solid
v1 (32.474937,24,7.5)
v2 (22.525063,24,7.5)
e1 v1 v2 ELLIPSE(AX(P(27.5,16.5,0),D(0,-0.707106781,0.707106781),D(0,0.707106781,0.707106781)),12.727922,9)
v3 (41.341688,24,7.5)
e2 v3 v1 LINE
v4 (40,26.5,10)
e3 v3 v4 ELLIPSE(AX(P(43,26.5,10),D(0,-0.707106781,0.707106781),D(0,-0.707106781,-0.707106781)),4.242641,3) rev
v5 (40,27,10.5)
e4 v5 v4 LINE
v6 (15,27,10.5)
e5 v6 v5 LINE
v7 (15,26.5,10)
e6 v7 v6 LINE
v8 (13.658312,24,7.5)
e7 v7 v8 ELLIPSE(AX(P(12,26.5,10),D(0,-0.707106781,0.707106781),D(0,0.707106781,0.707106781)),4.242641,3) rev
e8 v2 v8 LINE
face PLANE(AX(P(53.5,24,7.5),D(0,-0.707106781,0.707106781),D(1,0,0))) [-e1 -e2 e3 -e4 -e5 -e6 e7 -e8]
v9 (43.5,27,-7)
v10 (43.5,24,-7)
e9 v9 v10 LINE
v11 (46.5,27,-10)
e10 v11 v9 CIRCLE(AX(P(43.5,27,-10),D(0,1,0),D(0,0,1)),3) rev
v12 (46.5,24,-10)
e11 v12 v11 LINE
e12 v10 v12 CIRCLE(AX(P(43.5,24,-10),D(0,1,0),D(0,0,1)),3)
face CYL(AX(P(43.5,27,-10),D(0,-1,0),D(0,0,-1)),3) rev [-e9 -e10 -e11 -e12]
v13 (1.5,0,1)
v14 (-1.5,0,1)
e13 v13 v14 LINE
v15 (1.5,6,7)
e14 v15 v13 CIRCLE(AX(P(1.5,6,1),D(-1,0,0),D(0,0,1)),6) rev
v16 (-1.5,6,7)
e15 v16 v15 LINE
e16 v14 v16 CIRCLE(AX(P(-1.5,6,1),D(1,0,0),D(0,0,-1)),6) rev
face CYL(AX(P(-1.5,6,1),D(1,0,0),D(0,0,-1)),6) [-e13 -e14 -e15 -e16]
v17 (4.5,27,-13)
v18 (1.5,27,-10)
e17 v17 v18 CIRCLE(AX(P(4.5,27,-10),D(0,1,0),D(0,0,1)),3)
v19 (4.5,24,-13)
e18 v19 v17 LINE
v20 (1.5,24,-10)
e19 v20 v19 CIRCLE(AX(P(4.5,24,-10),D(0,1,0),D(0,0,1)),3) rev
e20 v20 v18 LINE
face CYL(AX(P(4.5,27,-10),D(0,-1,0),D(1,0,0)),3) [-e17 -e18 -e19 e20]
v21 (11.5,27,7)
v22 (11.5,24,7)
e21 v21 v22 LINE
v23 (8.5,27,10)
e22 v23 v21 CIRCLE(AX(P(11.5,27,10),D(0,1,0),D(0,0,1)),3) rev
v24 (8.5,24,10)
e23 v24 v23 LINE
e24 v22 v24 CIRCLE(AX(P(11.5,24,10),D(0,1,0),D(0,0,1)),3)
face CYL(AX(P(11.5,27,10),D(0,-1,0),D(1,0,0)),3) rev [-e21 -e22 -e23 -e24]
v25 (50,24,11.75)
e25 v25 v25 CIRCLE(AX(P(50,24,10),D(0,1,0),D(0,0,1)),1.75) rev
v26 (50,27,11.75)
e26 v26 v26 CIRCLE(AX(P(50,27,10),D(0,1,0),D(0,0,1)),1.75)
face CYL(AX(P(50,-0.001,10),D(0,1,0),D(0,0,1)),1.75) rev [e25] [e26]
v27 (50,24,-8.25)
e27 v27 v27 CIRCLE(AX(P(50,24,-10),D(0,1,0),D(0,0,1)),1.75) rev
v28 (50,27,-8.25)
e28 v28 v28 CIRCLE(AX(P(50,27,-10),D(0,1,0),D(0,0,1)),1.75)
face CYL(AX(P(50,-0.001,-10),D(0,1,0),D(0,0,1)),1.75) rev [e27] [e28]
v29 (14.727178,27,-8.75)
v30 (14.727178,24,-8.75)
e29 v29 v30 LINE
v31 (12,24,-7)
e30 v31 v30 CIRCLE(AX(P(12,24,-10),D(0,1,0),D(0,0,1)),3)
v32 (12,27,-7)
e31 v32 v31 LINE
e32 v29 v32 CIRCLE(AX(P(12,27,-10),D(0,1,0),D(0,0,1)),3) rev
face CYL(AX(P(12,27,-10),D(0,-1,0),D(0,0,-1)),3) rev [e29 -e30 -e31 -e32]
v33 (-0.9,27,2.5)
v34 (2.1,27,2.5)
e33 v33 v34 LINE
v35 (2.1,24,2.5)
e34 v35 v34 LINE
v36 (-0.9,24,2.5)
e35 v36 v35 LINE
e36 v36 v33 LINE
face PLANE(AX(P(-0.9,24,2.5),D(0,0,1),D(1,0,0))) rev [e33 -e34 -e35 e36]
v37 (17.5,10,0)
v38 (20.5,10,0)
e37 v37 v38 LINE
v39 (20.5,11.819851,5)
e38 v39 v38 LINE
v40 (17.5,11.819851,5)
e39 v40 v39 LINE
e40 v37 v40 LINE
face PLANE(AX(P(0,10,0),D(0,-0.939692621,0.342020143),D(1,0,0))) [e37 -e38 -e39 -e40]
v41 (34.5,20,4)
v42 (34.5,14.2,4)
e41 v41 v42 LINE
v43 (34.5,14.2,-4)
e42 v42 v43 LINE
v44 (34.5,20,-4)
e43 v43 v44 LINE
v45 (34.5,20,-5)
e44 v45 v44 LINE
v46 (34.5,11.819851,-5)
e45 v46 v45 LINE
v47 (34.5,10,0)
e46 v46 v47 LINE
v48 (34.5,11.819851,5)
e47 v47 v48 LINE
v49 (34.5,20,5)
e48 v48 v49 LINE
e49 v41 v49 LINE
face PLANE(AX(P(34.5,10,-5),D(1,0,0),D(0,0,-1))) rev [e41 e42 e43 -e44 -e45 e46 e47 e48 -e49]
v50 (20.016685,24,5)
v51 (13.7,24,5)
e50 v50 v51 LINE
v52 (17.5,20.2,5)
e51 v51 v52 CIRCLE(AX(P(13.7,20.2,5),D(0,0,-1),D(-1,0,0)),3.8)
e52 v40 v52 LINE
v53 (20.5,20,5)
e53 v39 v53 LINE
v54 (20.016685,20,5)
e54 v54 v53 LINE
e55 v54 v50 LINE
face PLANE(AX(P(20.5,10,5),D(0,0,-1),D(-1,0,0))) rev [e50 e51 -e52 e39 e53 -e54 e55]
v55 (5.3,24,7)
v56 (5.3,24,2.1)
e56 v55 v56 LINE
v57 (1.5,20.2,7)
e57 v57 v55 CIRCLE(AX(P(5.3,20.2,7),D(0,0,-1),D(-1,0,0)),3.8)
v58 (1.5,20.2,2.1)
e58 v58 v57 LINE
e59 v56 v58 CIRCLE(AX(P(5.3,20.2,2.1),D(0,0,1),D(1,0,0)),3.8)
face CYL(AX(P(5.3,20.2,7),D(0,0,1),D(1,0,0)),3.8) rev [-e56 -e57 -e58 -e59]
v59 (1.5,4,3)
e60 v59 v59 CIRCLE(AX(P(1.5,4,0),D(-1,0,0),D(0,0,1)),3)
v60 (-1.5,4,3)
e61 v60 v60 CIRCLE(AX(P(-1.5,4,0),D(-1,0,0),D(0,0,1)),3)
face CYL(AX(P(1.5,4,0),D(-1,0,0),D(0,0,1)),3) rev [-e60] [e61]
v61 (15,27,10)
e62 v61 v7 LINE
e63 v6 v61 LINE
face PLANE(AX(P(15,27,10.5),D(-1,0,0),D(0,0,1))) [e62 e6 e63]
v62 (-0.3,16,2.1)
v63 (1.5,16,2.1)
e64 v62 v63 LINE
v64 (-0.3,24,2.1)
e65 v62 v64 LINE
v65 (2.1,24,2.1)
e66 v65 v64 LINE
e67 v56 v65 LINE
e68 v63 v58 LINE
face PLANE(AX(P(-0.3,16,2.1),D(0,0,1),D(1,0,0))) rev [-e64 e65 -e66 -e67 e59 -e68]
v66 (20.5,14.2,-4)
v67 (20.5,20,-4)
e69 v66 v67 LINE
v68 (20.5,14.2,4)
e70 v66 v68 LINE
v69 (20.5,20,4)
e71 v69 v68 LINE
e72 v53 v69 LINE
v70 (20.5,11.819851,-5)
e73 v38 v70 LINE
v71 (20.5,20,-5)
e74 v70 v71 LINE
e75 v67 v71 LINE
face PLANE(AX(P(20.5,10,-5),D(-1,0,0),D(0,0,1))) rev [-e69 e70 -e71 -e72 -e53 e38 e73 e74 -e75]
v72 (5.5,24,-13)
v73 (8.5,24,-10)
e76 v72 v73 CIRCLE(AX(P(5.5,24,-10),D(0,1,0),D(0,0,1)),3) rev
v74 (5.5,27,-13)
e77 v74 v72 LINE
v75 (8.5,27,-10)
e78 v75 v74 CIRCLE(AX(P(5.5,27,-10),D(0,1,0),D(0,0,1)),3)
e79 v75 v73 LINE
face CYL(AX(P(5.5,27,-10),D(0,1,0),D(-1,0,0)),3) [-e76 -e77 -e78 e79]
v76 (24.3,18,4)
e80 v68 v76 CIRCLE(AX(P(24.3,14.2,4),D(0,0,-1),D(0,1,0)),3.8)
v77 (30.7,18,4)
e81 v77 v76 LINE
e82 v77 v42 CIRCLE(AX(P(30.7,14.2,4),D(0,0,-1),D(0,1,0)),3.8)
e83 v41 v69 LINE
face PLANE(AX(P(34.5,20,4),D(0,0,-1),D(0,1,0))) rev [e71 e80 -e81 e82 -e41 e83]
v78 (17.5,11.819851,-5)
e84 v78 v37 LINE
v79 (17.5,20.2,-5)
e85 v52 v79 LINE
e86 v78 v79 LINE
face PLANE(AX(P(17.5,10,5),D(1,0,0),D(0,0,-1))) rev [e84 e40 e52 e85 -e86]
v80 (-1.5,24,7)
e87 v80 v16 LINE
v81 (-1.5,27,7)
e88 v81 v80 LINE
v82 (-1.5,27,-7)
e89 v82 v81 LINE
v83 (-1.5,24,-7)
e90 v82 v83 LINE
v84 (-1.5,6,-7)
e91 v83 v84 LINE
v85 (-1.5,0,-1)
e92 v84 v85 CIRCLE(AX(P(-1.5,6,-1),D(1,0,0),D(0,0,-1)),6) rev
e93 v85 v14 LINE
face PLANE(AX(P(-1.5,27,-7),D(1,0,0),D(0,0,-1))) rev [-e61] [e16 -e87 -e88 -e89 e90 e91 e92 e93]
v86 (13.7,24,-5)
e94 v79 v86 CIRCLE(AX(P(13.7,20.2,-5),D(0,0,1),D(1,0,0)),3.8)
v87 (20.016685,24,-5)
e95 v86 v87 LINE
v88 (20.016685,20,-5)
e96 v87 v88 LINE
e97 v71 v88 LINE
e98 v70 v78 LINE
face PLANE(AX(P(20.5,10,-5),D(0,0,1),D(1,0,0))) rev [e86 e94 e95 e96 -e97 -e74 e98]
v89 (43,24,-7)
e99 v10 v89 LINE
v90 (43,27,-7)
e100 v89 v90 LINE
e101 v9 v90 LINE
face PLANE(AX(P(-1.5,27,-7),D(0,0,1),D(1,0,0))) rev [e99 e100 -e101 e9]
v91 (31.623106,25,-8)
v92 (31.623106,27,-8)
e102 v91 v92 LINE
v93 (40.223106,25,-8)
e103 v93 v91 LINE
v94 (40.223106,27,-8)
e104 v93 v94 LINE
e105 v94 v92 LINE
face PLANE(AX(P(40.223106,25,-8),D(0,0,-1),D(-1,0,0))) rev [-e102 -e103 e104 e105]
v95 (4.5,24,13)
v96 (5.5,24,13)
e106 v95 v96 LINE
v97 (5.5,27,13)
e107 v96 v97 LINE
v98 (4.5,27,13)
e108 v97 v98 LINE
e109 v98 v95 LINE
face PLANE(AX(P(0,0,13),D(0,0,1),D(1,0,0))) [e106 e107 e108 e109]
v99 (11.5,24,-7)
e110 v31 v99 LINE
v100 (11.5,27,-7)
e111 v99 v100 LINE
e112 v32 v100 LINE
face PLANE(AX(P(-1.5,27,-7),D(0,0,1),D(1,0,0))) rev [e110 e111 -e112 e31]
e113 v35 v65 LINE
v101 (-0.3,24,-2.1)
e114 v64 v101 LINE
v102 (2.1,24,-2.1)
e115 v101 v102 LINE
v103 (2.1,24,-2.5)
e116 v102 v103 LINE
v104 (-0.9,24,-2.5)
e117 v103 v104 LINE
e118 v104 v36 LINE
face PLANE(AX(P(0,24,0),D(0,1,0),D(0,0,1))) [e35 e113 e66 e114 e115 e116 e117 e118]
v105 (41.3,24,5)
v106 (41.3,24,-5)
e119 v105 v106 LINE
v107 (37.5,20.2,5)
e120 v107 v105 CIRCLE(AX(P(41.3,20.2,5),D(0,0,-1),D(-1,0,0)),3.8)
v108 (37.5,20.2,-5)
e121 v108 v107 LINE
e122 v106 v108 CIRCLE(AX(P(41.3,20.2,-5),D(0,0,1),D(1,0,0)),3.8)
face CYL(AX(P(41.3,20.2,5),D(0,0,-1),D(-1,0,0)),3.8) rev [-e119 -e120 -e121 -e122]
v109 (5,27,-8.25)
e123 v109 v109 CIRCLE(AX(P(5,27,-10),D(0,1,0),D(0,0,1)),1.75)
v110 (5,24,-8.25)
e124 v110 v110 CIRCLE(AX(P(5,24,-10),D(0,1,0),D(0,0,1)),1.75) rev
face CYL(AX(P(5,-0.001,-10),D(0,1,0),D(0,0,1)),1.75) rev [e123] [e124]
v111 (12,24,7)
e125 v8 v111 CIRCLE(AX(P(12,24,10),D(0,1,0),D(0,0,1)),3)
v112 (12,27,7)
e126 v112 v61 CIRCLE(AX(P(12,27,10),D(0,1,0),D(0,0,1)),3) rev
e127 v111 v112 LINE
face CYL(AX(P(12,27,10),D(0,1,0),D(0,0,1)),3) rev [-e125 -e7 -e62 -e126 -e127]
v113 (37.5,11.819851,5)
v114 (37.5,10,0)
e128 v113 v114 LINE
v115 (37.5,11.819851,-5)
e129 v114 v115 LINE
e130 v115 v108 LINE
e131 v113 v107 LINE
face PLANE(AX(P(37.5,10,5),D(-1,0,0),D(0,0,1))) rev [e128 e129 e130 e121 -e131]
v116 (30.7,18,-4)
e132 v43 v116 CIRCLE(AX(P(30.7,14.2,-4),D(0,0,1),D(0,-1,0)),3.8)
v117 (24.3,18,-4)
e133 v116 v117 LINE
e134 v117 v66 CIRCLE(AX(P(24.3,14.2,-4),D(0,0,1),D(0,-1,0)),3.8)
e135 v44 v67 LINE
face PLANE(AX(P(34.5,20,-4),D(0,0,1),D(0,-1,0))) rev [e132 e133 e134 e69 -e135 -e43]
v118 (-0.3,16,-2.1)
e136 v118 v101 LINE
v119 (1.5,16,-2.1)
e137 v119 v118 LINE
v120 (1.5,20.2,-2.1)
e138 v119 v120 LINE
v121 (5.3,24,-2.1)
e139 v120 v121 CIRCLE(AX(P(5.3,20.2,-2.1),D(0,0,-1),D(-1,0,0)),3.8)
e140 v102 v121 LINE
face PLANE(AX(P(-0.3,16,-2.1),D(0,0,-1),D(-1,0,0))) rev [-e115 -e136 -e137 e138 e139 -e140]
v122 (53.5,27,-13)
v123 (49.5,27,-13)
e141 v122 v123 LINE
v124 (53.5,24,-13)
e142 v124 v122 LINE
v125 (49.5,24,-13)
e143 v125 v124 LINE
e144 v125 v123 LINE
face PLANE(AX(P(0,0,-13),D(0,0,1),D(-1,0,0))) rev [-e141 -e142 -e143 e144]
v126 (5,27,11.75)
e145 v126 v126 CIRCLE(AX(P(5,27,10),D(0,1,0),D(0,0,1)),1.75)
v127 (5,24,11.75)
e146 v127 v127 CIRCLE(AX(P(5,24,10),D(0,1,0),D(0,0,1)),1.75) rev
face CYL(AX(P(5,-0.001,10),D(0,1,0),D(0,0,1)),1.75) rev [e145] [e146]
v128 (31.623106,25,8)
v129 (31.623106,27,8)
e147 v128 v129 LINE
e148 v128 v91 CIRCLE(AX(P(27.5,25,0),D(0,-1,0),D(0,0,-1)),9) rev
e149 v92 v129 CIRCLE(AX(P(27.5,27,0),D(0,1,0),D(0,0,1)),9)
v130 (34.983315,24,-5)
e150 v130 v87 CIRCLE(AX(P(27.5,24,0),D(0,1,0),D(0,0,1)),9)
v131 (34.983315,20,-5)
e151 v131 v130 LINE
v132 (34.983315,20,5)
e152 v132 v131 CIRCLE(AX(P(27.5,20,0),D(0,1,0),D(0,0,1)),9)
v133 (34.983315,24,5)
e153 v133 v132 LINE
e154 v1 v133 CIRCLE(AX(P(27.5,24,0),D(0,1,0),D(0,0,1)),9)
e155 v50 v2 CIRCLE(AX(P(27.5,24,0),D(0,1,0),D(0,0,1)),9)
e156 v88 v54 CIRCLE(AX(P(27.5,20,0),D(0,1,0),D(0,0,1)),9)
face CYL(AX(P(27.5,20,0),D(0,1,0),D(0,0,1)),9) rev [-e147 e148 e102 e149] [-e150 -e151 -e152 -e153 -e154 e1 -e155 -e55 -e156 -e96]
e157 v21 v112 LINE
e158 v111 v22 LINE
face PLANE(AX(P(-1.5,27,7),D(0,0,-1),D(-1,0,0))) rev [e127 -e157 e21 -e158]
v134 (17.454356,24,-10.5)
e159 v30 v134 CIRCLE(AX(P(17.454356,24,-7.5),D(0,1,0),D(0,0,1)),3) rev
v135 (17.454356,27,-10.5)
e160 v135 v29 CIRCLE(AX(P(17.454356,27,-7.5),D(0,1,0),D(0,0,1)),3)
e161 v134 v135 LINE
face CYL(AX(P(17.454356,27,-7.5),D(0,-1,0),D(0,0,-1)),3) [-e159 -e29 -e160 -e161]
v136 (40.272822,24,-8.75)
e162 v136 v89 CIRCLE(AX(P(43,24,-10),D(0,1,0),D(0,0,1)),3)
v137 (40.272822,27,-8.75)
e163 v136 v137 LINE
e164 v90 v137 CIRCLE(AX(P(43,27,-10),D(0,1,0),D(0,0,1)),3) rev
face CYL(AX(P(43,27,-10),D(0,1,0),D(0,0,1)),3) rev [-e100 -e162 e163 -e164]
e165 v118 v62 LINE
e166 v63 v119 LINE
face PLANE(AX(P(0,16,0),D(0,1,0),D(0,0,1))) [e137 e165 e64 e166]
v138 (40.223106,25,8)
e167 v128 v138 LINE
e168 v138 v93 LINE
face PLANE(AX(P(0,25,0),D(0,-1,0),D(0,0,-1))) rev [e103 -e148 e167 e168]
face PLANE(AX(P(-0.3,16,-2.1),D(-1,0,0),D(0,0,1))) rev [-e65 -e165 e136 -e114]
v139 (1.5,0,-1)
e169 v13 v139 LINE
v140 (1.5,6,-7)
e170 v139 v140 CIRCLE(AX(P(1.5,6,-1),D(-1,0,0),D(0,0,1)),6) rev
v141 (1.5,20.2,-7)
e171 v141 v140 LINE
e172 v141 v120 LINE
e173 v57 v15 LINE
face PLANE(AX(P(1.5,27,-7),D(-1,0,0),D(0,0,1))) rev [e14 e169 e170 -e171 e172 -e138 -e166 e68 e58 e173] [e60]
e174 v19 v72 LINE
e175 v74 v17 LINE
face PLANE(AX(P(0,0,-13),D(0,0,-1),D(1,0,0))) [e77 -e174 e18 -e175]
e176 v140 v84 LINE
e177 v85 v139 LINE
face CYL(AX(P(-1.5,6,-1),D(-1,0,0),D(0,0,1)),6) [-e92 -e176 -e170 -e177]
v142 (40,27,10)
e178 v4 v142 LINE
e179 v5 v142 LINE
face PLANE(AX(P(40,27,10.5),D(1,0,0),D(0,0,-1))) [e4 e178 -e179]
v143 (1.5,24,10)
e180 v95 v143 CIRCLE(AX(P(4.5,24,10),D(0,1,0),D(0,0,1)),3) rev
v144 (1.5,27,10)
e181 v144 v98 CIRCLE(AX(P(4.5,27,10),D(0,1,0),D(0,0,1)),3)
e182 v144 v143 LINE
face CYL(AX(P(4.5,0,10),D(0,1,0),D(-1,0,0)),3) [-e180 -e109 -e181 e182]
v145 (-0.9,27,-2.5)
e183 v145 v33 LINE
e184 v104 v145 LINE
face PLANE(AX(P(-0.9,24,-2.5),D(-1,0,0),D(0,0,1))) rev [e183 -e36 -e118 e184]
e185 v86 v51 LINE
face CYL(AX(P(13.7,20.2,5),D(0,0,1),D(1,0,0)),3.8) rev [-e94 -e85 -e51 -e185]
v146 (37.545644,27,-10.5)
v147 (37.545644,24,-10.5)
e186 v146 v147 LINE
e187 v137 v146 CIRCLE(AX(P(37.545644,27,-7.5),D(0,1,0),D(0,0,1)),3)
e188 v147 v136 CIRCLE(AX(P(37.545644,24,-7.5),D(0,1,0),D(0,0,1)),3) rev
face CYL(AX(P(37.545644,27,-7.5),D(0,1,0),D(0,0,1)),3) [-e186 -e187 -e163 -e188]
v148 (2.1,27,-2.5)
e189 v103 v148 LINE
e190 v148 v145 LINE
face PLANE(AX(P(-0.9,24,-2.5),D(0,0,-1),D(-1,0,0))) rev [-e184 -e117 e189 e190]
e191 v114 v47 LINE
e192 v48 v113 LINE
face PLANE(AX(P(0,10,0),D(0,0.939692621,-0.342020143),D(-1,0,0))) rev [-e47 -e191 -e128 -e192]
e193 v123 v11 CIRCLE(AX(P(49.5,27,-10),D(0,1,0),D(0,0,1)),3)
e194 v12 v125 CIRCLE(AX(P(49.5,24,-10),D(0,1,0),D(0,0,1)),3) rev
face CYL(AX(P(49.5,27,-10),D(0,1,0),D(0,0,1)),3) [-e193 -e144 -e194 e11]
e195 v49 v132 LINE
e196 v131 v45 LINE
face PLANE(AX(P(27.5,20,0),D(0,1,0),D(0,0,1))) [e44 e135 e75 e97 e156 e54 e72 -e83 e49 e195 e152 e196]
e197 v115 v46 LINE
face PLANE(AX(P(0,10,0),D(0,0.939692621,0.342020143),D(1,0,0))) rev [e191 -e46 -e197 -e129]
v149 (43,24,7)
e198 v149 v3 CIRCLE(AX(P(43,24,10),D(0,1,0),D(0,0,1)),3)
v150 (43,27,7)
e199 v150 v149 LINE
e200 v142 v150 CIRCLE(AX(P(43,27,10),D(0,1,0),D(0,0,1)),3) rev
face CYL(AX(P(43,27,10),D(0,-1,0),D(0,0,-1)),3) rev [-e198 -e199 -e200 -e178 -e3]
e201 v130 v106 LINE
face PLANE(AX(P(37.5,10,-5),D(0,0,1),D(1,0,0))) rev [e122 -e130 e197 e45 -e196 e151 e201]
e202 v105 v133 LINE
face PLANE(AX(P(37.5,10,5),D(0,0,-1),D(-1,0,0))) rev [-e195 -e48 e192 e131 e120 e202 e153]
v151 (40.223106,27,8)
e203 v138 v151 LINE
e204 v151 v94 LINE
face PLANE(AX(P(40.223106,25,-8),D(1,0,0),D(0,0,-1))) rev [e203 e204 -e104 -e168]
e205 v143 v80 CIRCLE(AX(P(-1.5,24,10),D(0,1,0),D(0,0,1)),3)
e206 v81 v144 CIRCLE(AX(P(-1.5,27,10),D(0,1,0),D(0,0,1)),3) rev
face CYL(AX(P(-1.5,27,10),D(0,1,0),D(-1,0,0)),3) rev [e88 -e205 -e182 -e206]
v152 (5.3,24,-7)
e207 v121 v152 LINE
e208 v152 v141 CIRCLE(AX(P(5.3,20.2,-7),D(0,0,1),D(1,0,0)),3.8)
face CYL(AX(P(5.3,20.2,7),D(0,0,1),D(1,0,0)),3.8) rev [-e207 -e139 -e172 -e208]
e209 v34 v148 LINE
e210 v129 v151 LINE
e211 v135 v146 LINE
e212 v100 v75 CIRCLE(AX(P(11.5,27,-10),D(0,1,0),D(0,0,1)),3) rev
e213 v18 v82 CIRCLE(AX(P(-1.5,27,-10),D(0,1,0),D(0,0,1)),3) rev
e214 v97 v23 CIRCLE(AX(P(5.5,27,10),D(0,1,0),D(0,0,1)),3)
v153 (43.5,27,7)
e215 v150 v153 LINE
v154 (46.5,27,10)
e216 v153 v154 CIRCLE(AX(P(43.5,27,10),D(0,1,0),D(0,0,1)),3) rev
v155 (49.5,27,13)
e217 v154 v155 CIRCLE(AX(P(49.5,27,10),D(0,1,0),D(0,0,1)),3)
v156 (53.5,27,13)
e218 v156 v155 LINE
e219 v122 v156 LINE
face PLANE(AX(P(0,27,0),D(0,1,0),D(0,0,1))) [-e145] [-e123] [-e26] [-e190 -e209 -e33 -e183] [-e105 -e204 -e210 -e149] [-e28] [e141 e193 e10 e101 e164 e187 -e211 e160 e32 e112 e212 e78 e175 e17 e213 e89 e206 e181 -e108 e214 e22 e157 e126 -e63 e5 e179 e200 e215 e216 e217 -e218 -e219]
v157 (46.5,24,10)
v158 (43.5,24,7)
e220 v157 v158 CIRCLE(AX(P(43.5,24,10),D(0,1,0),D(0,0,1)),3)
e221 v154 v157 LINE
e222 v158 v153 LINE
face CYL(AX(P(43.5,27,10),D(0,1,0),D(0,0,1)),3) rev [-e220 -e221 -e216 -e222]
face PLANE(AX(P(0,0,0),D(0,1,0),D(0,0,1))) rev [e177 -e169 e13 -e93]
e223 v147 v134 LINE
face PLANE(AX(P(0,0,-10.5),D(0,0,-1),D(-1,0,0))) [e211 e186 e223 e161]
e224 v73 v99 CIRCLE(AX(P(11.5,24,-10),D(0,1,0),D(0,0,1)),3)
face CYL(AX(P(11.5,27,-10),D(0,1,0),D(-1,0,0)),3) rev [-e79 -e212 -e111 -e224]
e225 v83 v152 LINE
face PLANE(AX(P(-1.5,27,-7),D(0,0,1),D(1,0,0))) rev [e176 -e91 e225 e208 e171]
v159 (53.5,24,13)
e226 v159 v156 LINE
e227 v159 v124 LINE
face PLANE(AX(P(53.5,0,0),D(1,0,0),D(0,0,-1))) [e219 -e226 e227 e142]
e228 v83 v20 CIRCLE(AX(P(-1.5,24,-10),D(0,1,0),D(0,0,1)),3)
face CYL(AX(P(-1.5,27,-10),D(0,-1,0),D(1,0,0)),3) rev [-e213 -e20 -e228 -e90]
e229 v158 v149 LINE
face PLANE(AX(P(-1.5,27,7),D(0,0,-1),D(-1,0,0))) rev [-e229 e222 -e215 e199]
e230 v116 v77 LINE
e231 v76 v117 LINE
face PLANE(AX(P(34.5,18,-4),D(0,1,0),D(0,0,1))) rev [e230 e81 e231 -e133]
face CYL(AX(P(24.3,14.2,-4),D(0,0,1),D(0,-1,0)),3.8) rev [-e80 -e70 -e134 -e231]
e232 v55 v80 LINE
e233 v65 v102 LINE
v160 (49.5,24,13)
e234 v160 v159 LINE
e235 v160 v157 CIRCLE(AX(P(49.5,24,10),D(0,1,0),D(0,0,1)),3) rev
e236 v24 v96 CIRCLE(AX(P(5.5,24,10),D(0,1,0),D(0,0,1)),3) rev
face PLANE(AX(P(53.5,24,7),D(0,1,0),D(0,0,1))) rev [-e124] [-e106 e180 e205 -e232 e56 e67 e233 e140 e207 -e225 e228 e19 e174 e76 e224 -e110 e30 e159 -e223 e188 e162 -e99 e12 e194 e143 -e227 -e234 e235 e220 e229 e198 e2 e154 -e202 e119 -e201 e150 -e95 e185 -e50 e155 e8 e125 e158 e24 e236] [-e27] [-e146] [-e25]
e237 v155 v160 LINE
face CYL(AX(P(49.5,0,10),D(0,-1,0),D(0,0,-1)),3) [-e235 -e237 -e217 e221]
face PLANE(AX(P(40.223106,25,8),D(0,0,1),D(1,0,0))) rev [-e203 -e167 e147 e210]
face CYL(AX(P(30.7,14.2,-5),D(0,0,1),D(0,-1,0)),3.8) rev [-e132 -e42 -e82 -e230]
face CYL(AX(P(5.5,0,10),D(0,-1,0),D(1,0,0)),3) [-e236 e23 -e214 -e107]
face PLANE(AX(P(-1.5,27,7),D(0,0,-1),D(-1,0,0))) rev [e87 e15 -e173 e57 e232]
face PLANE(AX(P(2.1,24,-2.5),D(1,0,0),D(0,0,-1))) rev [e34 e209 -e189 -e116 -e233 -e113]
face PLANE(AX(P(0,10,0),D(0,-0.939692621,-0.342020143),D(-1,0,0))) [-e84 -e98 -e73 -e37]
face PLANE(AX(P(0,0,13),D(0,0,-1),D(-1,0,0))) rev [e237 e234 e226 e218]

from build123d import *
from OCP.BRepFilletAPI import BRepFilletAPI_MakeChamfer

# Parameters (mm, degrees)
SKETCH1_W           = 3
SKETCH1_H           = 14
BOSS_EXTRUDE1_DEPTH = 27
SKETCH2_R           = 3
CUT_EXTRUDE1_DEPTH  = 29.053520278
SKETCH3_W           = 14
SKETCH3_H           = 3
BOSS_EXTRUDE2_DEPTH = 52
SKETCH4_W           = 3
SKETCH4_H           = 10
BOSS_EXTRUDE3_DEPTH = 14
CHAMFER1_SIZE       = 1.819851171
CHAMFER1_SIZE_2     = 5
SKETCH6_W           = 25
SKETCH6_H           = 3
BOSS_EXTRUDE5_DEPTH = 3.5
SKETCH5_W           = 7
SKETCH5_H           = 3
BOSS_EXTRUDE4_DEPTH = 6
SKETCH7_R           = 9
CUT_EXTRUDE2_DEPTH  = 7
CHAMFER2_SIZE       = 3
SKETCH8_W           = 8
SKETCH8_H           = 2
BOSS_EXTRUDE6_DEPTH = 14
SKETCH9_W           = 8.6
SKETCH9_H           = 16
CUT_EXTRUDE3_DEPTH  = 2
CUT_EXTRUDE4_REACH  = 63.321
SKETCH10_R          = 1.75
SKETCH11_W          = 1.8
SKETCH11_H          = 4.2
CUT_EXTRUDE5_DEPTH  = 11
FILLET1_R           = 3
FILLET2_R           = 3
FILLET3_R           = 3.8
FILLET4_R           = 6
SKETCH12_W          = 3
SKETCH12_H          = 5
CUT_EXTRUDE6_DEPTH  = 3


# Some blends are built 0.0001 mm under size
with BuildPart() as part:
    # Sketch1 → Boss-Extrude1 (new body)
    with BuildSketch(Plane(origin=(0, 0, 0), x_dir=(1, 0, 0), z_dir=(0, 1, 0))):
        Rectangle(SKETCH1_W, SKETCH1_H)
    extrude(amount=BOSS_EXTRUDE1_DEPTH)

    # Sketch2 → Cut-Extrude1 (cut, through all)
    with BuildSketch(Plane.ZY.offset(1.5)):
        with Locations((0, 4)):
            Circle(SKETCH2_R)
    extrude(amount=-CUT_EXTRUDE1_DEPTH, mode=Mode.SUBTRACT)

    # Sketch3 → Boss-Extrude2 (add)
    with BuildSketch(Plane(origin=(1.5, 0, 0), x_dir=(0, 0, -1), z_dir=(1, 0, 0))):
        with Locations((0, 25.5)):
            Rectangle(SKETCH3_W, SKETCH3_H)
    extrude(amount=BOSS_EXTRUDE2_DEPTH)

    # Sketch4 → Boss-Extrude3 (add)
    with BuildSketch(Plane.XZ.offset(-24)):
        with Locations((36, 0)):
            Rectangle(SKETCH4_W, SKETCH4_H)
        with Locations((19, 0)):
            Rectangle(SKETCH4_W, SKETCH4_H)
    extrude(amount=BOSS_EXTRUDE3_DEPTH)

    # Chamfer1
    chamfer1_edges_1 = [part.edges().sort_by_distance(p)[0] for p in [
        (36, 10, -5),
    ]]
    chamfer1_side_1 = [part.faces().sort_by_distance(p)[0] for p in [
        (36, 10.036397023, -5),
    ]]
    chamfer1_edges_2 = [part.edges().sort_by_distance(p)[0] for p in [
        (36, 10, 5),
    ]]
    chamfer1_side_2 = [part.faces().sort_by_distance(p)[0] for p in [
        (36, 10.036397023, 5),
    ]]
    chamfer1_edges_3 = [part.edges().sort_by_distance(p)[0] for p in [
        (19, 10, 5),
    ]]
    chamfer1_side_3 = [part.faces().sort_by_distance(p)[0] for p in [
        (19, 10.036397023, 5),
    ]]
    chamfer1_edges_4 = [part.edges().sort_by_distance(p)[0] for p in [
        (19, 10, -5),
    ]]
    chamfer1_side_4 = [part.faces().sort_by_distance(p)[0] for p in [
        (19, 10.036397023, -5),
    ]]
    chamfer1 = BRepFilletAPI_MakeChamfer(part.part.solid().wrapped)
    for e in chamfer1_edges_1:
        chamfer1.Add(CHAMFER1_SIZE - 0.0001, CHAMFER1_SIZE_2 - 0.0001, e.wrapped, chamfer1_side_1[0].wrapped)
    for e in chamfer1_edges_2:
        chamfer1.Add(CHAMFER1_SIZE - 0.0001, CHAMFER1_SIZE_2 - 0.0001, e.wrapped, chamfer1_side_2[0].wrapped)
    for e in chamfer1_edges_3:
        chamfer1.Add(CHAMFER1_SIZE - 0.0001, CHAMFER1_SIZE_2 - 0.0001, e.wrapped, chamfer1_side_3[0].wrapped)
    for e in chamfer1_edges_4:
        chamfer1.Add(CHAMFER1_SIZE - 0.0001, CHAMFER1_SIZE_2 - 0.0001, e.wrapped, chamfer1_side_4[0].wrapped)
    add(Compound.cast(chamfer1.Shape()), mode=Mode.REPLACE)  # a hair under: the kernel refuses the full size

    # Sketch6 → Boss-Extrude5 (add)
    with BuildSketch(Plane(origin=(0, 0, -7), x_dir=(-1, 0, 0), z_dir=(0, 0, -1))):
        with Locations((-27.5, 25.5)):
            Rectangle(SKETCH6_W, SKETCH6_H)
    boss_extrude5 = extrude(amount=BOSS_EXTRUDE5_DEPTH)

    # Sketch5 → Boss-Extrude4 (add)
    with BuildSketch(Plane.XY.offset(7)):
        with Locations((5, 25.5)):
            Rectangle(SKETCH5_W, SKETCH5_H)
        with Locations((50, 25.5)):
            Rectangle(SKETCH5_W, SKETCH5_H)
    boss_extrude4 = extrude(amount=BOSS_EXTRUDE4_DEPTH)

    # Mirror1: Boss-Extrude5, Boss-Extrude4 across plane
    add(boss_extrude5.mirror(Plane.XY))
    add(boss_extrude4.mirror(Plane.XY))

    # Sketch7 → Cut-Extrude2 (cut)
    with BuildSketch(Plane(origin=(0, 27, 0), x_dir=(1, 0, 0), z_dir=(0, 1, 0))):
        with Locations(Location((27.5, 0, 0), (0, 0, 270))):
            Circle(SKETCH7_R)
    extrude(amount=-CUT_EXTRUDE2_DEPTH, mode=Mode.SUBTRACT)

    # Chamfer2
    # the kernel refuses this chamfer: 3 mm, written as the material it takes off along each edge
    with BuildSketch(Plane(origin=(15, 24, 10.5), x_dir=(0, -0.027495876610586757, -0.9996219169112968), z_dir=(1, 0, 0))) as chamfer2_piece_1:
        Polygon((CHAMFER2_SIZE * 0.999621916911, CHAMFER2_SIZE * 0.0274958766106), (-CHAMFER2_SIZE * 0.0274958766106, CHAMFER2_SIZE * 0.999621916911), (0, 0), align=None)
    extrude(amount=25, mode=Mode.SUBTRACT)

    # Sketch8 → Boss-Extrude6 (add)
    with BuildSketch(Plane(origin=(20.5, 0, 0), x_dir=(0, 0, -1), z_dir=(1, 0, 0))):
        with Locations((0, 19)):
            Rectangle(SKETCH8_W, SKETCH8_H)
    extrude(amount=BOSS_EXTRUDE6_DEPTH)

    # Sketch9 → Cut-Extrude3 (cut)
    with BuildSketch(Plane(origin=(0, 27, 0), x_dir=(1, 0, 0), z_dir=(0, 1, 0))):
        with Locations((35.923105626, 0)):
            Rectangle(SKETCH9_W, SKETCH9_H)
    extrude(amount=-CUT_EXTRUDE3_DEPTH, mode=Mode.SUBTRACT)

    # Sketch10 → Cut-Extrude4 (cut, up to next)
    with BuildSketch(Plane(origin=(0, 27, 0), x_dir=(1, 0, 0), z_dir=(0, 1, 0)), mode=Mode.PRIVATE) as cut_extrude4_sk1:
        with Locations(Location((5, -10, 0), (0, 0, 270))):
            Circle(SKETCH10_R)
    cut_extrude4_tool1 = extrude(cut_extrude4_sk1.sketch, amount=-CUT_EXTRUDE4_REACH, mode=Mode.PRIVATE) & part.part
    # Sketch10 → Cut-Extrude4 (cut, up to next)
    with BuildSketch(Plane(origin=(0, 27, 0), x_dir=(1, 0, 0), z_dir=(0, 1, 0)), mode=Mode.PRIVATE) as cut_extrude4_sk2:
        with Locations(Location((50, -10, 0), (0, 0, 270))):
            Circle(SKETCH10_R)
    cut_extrude4_tool2 = extrude(cut_extrude4_sk2.sketch, amount=-CUT_EXTRUDE4_REACH, mode=Mode.PRIVATE) & part.part
    # Sketch10 → Cut-Extrude4 (cut, up to next)
    with BuildSketch(Plane(origin=(0, 27, 0), x_dir=(1, 0, 0), z_dir=(0, 1, 0)), mode=Mode.PRIVATE) as cut_extrude4_sk3:
        with Locations(Location((50, 10, 0), (0, 0, 270))):
            Circle(SKETCH10_R)
    cut_extrude4_tool3 = extrude(cut_extrude4_sk3.sketch, amount=-CUT_EXTRUDE4_REACH, mode=Mode.PRIVATE) & part.part
    # Sketch10 → Cut-Extrude4 (cut, up to next)
    with BuildSketch(Plane(origin=(0, 27, 0), x_dir=(1, 0, 0), z_dir=(0, 1, 0)), mode=Mode.PRIVATE) as cut_extrude4_sk4:
        with Locations(Location((5, 10, 0), (0, 0, 270))):
            Circle(SKETCH10_R)
    cut_extrude4_tool4 = extrude(cut_extrude4_sk4.sketch, amount=-CUT_EXTRUDE4_REACH, mode=Mode.PRIVATE) & part.part
    add(cut_extrude4_tool1.solids().sort_by_distance((5, 27, 10))[0], mode=Mode.SUBTRACT)
    add(cut_extrude4_tool2.solids().sort_by_distance((50, 27, 10))[0], mode=Mode.SUBTRACT)
    add(cut_extrude4_tool3.solids().sort_by_distance((50, 27, -10))[0], mode=Mode.SUBTRACT)
    add(cut_extrude4_tool4.solids().sort_by_distance((5, 27, -10))[0], mode=Mode.SUBTRACT)

    # Sketch11 → Cut-Extrude5 (cut)
    with BuildSketch(Plane(origin=(0, 27, 0), x_dir=(1, 0, 0), z_dir=(0, 1, 0))):
        with Locations((0.6, 0)):
            Rectangle(SKETCH11_W, SKETCH11_H)
    extrude(amount=-CUT_EXTRUDE5_DEPTH, mode=Mode.SUBTRACT)

    # Fillet1
    # the kernel refuses this fillet: 3 mm, written as the material it adds along each edge
    with BuildSketch(Plane(origin=(46.5, 24, 7), x_dir=(0, 0, 1), z_dir=(0, 1, 0)), Plane(origin=(8.5, 27, 7), x_dir=(0, 0, 1), z_dir=(0, -1, 0)), Plane(origin=(1.5, 24, 7), x_dir=(0, 0, 1), z_dir=(0, 1, 0)), Plane(origin=(46.5, 24, -7), x_dir=(-1, 0, 0), z_dir=(0, 1, 0))) as fillet1_piece_1:
        with BuildLine():
            CenterArc((FILLET1_R, -FILLET1_R), FILLET1_R, 90, 90)
            Line((0, -FILLET1_R), (0, 0))
            Line((0, 0), (FILLET1_R, 0))
        make_face()
    extrude(amount=3)
    with BuildSketch(Plane(origin=(40, 24, 7), x_dir=(1, 0, 0), z_dir=(0, 1, 0))) as fillet1_piece_2_section:
        with BuildLine():
            CenterArc((FILLET1_R, -FILLET1_R), FILLET1_R, 90, 90)
            Line((0, -FILLET1_R), (0, 0))
            Line((0, 0), (FILLET1_R, 0))
        make_face()
    fillet1_piece_2 = extrude(amount=8.5, mode=Mode.PRIVATE)
    fillet1_piece_2 = split(fillet1_piece_2, bisect_by=Plane(origin=(40.974089344, 24.187586332, 7.687586332), z_dir=(0, 0.7071067811862648, -0.7071067811868302)), keep=Keep.TOP, mode=Mode.PRIVATE)
    fillet1_piece_2 = split(fillet1_piece_2, bisect_by=Plane(origin=(40.974089344, 27, 7.348410065), z_dir=(0, -1, 0)), keep=Keep.TOP, mode=Mode.PRIVATE)
    fillet1_piece_2 = split(fillet1_piece_2, bisect_by=Plane(origin=(40.223105626, 24.526762599, 7.348410065), z_dir=(1, 0, 0)), keep=Keep.TOP, mode=Mode.PRIVATE)
    add(fillet1_piece_2)
    with BuildSketch(Plane(origin=(40, 24, 7), x_dir=(1, 0, 0), z_dir=(0, 1, 0))) as fillet1_piece_3_section:
        with BuildLine():
            CenterArc((FILLET1_R, -FILLET1_R), FILLET1_R, 90, 90)
            Line((0, -FILLET1_R), (0, 0))
            Line((0, 0), (FILLET1_R, 0))
        make_face()
    fillet1_piece_3 = extrude(amount=1, mode=Mode.PRIVATE)
    fillet1_piece_3 = split(fillet1_piece_3, bisect_by=Plane(origin=(40.111552813, 24.25, 7.75), z_dir=(0, 0.7071067811862648, -0.7071067811868302)), keep=Keep.TOP, mode=Mode.PRIVATE)
    add(fillet1_piece_3)
    with BuildSketch(Plane(origin=(40, 16.5, 7), x_dir=(1, 0, 0), z_dir=(0, 1, 0))) as fillet1_piece_4_section:
        with BuildLine():
            CenterArc((FILLET1_R, -FILLET1_R), FILLET1_R, 90, 90)
            Line((0, -FILLET1_R), (0, 0))
            Line((0, 0), (FILLET1_R, 0))
        make_face()
    fillet1_piece_4 = extrude(amount=16, mode=Mode.PRIVATE)
    fillet1_piece_4 = split(fillet1_piece_4, bisect_by=Plane(origin=(40.102150249, 25.589388324, 9.089388324), z_dir=(0, 0.7071067811862648, -0.7071067811868302)), keep=Keep.TOP, mode=Mode.PRIVATE)
    fillet1_piece_4 = split(fillet1_piece_4, bisect_by=Plane(origin=(40.102150249, 27, 8.580734209), z_dir=(0, -1, 0)), keep=Keep.TOP, mode=Mode.PRIVATE)
    fillet1_piece_4 = split(fillet1_piece_4, bisect_by=Plane(origin=(40.102150249, 26.098042439, 8), z_dir=(0, 0, 1)), keep=Keep.TOP, mode=Mode.PRIVATE)
    add(fillet1_piece_4)
    with BuildSketch(Plane(origin=(15, 27, 7), x_dir=(-1, 0, 0), z_dir=(0, -1, 0))) as fillet1_piece_5_section:
        with BuildLine():
            CenterArc((FILLET1_R, -FILLET1_R), FILLET1_R, 90, 90)
            Line((0, -FILLET1_R), (0, 0))
            Line((0, 0), (FILLET1_R, 0))
        make_face()
    fillet1_piece_5 = extrude(amount=3, mode=Mode.PRIVATE)
    fillet1_piece_5 = split(fillet1_piece_5, bisect_by=Plane(origin=(14.281357865, 24.846943588, 8.346943588), z_dir=(0, 0.7071067811862648, -0.7071067811868302)), keep=Keep.TOP, mode=Mode.PRIVATE)
    add(fillet1_piece_5)
    with BuildSketch(Plane(origin=(1.5, 24, -7), x_dir=(0, 0, -1), z_dir=(0, 1, 0)), Plane(origin=(8.5, 27, -7), x_dir=(0, 0, -1), z_dir=(0, -1, 0)), Plane(origin=(15, 27, -7), x_dir=(-1, 0, 0), z_dir=(0, -1, 0))) as fillet1_piece_6:
        with BuildLine():
            CenterArc((FILLET1_R, FILLET1_R), FILLET1_R, 180, 90)
            Line((0, FILLET1_R), (0, 0))
            Line((0, 0), (FILLET1_R, 0))
        make_face()
    extrude(amount=3)
    with BuildSketch(Plane(origin=(40, 24, -7), x_dir=(0, 0, -1), z_dir=(0, 1, 0))) as fillet1_piece_7_section:
        with BuildLine():
            CenterArc((FILLET1_R, -FILLET1_R), FILLET1_R, 90, 90)
            Line((0, -FILLET1_R), (0, 0))
            Line((0, 0), (FILLET1_R, 0))
        make_face()
    fillet1_piece_7 = extrude(amount=8.5, mode=Mode.PRIVATE)
    fillet1_piece_7 = split(fillet1_piece_7, bisect_by=Plane(origin=(40.097980222, 27, -8.647383522), z_dir=(0, -1, 0)), keep=Keep.TOP, mode=Mode.PRIVATE)
    fillet1_piece_7 = split(fillet1_piece_7, bisect_by=Plane(origin=(40.097980222, 24.5, -8), z_dir=(0, 0, -1)), keep=Keep.TOP, mode=Mode.PRIVATE)
    add(fillet1_piece_7)
    with BuildSketch(Plane(origin=(40, 24, -7), x_dir=(0, 0, -1), z_dir=(0, 1, 0))) as fillet1_piece_8:
        with BuildLine():
            CenterArc((FILLET1_R, -FILLET1_R), FILLET1_R, 90, 90)
            Line((0, -FILLET1_R), (0, 0))
            Line((0, 0), (FILLET1_R, 0))
        make_face()
    extrude(amount=1)
    with BuildSketch(Plane(origin=(40, 16.5, -7), x_dir=(0, 0, -1), z_dir=(0, 1, 0))) as fillet1_piece_9_section:
        with BuildLine():
            CenterArc((FILLET1_R, -FILLET1_R), FILLET1_R, 90, 90)
            Line((0, -FILLET1_R), (0, 0))
            Line((0, 0), (FILLET1_R, 0))
        make_face()
    fillet1_piece_9 = extrude(amount=16, mode=Mode.PRIVATE)
    fillet1_piece_9 = split(fillet1_piece_9, bisect_by=Plane(origin=(40.946316816, 27, -7.381877422), z_dir=(0, -1, 0)), keep=Keep.TOP, mode=Mode.PRIVATE)
    fillet1_piece_9 = split(fillet1_piece_9, bisect_by=Plane(origin=(40.946316816, 25, -7.381877422), z_dir=(0, 1, 0)), keep=Keep.TOP, mode=Mode.PRIVATE)
    fillet1_piece_9 = split(fillet1_piece_9, bisect_by=Plane(origin=(40.223105626, 26, -7.381877422), z_dir=(1, 0, 0)), keep=Keep.TOP, mode=Mode.PRIVATE)
    add(fillet1_piece_9)

    # Fillet2
    fillet2_edges = [part.edges().sort_by_distance(p)[0] for p in [
        (46.5, 25.5, 13),
        (46.5, 25.5, -13),
        (40, 25.5, -10.5),
        (15, 25.5, -10.5),
        (8.5, 25.5, 13),
        (1.5, 25.5, 13),
        (1.5, 25.5, -13),
        (8.5, 25.5, -13),
    ]]
    fillet(fillet2_edges, radius=FILLET2_R - 0.0001)  # a hair under: the kernel refuses the full size

    # Fillet3
    fillet3_edges = [part.edges().sort_by_distance(p)[0] for p in [
        (20.5, 18, 0),
        (34.5, 18, 0),
        (1.5, 24, 4.55),
        (1.5, 24, -4.55),
        (17.5, 24, 0),
        (37.5, 24, 0),
    ]]
    fillet(fillet3_edges, radius=FILLET3_R)

    # Fillet4
    fillet4_edges = [part.edges().sort_by_distance(p)[0] for p in [
        (0, 0, 7),
        (0, 0, -7),
    ]]
    fillet(fillet4_edges, radius=FILLET4_R)

    # Sketch12 → Cut-Extrude6 (cut)
    with BuildSketch(Plane(origin=(0, 27, 0), x_dir=(1, 0, 0), z_dir=(0, 1, 0))):
        with Locations((0.6, 0)):
            Rectangle(SKETCH12_W, SKETCH12_H)
    extrude(amount=-CUT_EXTRUDE6_DEPTH, mode=Mode.SUBTRACT)


solid = part.part
